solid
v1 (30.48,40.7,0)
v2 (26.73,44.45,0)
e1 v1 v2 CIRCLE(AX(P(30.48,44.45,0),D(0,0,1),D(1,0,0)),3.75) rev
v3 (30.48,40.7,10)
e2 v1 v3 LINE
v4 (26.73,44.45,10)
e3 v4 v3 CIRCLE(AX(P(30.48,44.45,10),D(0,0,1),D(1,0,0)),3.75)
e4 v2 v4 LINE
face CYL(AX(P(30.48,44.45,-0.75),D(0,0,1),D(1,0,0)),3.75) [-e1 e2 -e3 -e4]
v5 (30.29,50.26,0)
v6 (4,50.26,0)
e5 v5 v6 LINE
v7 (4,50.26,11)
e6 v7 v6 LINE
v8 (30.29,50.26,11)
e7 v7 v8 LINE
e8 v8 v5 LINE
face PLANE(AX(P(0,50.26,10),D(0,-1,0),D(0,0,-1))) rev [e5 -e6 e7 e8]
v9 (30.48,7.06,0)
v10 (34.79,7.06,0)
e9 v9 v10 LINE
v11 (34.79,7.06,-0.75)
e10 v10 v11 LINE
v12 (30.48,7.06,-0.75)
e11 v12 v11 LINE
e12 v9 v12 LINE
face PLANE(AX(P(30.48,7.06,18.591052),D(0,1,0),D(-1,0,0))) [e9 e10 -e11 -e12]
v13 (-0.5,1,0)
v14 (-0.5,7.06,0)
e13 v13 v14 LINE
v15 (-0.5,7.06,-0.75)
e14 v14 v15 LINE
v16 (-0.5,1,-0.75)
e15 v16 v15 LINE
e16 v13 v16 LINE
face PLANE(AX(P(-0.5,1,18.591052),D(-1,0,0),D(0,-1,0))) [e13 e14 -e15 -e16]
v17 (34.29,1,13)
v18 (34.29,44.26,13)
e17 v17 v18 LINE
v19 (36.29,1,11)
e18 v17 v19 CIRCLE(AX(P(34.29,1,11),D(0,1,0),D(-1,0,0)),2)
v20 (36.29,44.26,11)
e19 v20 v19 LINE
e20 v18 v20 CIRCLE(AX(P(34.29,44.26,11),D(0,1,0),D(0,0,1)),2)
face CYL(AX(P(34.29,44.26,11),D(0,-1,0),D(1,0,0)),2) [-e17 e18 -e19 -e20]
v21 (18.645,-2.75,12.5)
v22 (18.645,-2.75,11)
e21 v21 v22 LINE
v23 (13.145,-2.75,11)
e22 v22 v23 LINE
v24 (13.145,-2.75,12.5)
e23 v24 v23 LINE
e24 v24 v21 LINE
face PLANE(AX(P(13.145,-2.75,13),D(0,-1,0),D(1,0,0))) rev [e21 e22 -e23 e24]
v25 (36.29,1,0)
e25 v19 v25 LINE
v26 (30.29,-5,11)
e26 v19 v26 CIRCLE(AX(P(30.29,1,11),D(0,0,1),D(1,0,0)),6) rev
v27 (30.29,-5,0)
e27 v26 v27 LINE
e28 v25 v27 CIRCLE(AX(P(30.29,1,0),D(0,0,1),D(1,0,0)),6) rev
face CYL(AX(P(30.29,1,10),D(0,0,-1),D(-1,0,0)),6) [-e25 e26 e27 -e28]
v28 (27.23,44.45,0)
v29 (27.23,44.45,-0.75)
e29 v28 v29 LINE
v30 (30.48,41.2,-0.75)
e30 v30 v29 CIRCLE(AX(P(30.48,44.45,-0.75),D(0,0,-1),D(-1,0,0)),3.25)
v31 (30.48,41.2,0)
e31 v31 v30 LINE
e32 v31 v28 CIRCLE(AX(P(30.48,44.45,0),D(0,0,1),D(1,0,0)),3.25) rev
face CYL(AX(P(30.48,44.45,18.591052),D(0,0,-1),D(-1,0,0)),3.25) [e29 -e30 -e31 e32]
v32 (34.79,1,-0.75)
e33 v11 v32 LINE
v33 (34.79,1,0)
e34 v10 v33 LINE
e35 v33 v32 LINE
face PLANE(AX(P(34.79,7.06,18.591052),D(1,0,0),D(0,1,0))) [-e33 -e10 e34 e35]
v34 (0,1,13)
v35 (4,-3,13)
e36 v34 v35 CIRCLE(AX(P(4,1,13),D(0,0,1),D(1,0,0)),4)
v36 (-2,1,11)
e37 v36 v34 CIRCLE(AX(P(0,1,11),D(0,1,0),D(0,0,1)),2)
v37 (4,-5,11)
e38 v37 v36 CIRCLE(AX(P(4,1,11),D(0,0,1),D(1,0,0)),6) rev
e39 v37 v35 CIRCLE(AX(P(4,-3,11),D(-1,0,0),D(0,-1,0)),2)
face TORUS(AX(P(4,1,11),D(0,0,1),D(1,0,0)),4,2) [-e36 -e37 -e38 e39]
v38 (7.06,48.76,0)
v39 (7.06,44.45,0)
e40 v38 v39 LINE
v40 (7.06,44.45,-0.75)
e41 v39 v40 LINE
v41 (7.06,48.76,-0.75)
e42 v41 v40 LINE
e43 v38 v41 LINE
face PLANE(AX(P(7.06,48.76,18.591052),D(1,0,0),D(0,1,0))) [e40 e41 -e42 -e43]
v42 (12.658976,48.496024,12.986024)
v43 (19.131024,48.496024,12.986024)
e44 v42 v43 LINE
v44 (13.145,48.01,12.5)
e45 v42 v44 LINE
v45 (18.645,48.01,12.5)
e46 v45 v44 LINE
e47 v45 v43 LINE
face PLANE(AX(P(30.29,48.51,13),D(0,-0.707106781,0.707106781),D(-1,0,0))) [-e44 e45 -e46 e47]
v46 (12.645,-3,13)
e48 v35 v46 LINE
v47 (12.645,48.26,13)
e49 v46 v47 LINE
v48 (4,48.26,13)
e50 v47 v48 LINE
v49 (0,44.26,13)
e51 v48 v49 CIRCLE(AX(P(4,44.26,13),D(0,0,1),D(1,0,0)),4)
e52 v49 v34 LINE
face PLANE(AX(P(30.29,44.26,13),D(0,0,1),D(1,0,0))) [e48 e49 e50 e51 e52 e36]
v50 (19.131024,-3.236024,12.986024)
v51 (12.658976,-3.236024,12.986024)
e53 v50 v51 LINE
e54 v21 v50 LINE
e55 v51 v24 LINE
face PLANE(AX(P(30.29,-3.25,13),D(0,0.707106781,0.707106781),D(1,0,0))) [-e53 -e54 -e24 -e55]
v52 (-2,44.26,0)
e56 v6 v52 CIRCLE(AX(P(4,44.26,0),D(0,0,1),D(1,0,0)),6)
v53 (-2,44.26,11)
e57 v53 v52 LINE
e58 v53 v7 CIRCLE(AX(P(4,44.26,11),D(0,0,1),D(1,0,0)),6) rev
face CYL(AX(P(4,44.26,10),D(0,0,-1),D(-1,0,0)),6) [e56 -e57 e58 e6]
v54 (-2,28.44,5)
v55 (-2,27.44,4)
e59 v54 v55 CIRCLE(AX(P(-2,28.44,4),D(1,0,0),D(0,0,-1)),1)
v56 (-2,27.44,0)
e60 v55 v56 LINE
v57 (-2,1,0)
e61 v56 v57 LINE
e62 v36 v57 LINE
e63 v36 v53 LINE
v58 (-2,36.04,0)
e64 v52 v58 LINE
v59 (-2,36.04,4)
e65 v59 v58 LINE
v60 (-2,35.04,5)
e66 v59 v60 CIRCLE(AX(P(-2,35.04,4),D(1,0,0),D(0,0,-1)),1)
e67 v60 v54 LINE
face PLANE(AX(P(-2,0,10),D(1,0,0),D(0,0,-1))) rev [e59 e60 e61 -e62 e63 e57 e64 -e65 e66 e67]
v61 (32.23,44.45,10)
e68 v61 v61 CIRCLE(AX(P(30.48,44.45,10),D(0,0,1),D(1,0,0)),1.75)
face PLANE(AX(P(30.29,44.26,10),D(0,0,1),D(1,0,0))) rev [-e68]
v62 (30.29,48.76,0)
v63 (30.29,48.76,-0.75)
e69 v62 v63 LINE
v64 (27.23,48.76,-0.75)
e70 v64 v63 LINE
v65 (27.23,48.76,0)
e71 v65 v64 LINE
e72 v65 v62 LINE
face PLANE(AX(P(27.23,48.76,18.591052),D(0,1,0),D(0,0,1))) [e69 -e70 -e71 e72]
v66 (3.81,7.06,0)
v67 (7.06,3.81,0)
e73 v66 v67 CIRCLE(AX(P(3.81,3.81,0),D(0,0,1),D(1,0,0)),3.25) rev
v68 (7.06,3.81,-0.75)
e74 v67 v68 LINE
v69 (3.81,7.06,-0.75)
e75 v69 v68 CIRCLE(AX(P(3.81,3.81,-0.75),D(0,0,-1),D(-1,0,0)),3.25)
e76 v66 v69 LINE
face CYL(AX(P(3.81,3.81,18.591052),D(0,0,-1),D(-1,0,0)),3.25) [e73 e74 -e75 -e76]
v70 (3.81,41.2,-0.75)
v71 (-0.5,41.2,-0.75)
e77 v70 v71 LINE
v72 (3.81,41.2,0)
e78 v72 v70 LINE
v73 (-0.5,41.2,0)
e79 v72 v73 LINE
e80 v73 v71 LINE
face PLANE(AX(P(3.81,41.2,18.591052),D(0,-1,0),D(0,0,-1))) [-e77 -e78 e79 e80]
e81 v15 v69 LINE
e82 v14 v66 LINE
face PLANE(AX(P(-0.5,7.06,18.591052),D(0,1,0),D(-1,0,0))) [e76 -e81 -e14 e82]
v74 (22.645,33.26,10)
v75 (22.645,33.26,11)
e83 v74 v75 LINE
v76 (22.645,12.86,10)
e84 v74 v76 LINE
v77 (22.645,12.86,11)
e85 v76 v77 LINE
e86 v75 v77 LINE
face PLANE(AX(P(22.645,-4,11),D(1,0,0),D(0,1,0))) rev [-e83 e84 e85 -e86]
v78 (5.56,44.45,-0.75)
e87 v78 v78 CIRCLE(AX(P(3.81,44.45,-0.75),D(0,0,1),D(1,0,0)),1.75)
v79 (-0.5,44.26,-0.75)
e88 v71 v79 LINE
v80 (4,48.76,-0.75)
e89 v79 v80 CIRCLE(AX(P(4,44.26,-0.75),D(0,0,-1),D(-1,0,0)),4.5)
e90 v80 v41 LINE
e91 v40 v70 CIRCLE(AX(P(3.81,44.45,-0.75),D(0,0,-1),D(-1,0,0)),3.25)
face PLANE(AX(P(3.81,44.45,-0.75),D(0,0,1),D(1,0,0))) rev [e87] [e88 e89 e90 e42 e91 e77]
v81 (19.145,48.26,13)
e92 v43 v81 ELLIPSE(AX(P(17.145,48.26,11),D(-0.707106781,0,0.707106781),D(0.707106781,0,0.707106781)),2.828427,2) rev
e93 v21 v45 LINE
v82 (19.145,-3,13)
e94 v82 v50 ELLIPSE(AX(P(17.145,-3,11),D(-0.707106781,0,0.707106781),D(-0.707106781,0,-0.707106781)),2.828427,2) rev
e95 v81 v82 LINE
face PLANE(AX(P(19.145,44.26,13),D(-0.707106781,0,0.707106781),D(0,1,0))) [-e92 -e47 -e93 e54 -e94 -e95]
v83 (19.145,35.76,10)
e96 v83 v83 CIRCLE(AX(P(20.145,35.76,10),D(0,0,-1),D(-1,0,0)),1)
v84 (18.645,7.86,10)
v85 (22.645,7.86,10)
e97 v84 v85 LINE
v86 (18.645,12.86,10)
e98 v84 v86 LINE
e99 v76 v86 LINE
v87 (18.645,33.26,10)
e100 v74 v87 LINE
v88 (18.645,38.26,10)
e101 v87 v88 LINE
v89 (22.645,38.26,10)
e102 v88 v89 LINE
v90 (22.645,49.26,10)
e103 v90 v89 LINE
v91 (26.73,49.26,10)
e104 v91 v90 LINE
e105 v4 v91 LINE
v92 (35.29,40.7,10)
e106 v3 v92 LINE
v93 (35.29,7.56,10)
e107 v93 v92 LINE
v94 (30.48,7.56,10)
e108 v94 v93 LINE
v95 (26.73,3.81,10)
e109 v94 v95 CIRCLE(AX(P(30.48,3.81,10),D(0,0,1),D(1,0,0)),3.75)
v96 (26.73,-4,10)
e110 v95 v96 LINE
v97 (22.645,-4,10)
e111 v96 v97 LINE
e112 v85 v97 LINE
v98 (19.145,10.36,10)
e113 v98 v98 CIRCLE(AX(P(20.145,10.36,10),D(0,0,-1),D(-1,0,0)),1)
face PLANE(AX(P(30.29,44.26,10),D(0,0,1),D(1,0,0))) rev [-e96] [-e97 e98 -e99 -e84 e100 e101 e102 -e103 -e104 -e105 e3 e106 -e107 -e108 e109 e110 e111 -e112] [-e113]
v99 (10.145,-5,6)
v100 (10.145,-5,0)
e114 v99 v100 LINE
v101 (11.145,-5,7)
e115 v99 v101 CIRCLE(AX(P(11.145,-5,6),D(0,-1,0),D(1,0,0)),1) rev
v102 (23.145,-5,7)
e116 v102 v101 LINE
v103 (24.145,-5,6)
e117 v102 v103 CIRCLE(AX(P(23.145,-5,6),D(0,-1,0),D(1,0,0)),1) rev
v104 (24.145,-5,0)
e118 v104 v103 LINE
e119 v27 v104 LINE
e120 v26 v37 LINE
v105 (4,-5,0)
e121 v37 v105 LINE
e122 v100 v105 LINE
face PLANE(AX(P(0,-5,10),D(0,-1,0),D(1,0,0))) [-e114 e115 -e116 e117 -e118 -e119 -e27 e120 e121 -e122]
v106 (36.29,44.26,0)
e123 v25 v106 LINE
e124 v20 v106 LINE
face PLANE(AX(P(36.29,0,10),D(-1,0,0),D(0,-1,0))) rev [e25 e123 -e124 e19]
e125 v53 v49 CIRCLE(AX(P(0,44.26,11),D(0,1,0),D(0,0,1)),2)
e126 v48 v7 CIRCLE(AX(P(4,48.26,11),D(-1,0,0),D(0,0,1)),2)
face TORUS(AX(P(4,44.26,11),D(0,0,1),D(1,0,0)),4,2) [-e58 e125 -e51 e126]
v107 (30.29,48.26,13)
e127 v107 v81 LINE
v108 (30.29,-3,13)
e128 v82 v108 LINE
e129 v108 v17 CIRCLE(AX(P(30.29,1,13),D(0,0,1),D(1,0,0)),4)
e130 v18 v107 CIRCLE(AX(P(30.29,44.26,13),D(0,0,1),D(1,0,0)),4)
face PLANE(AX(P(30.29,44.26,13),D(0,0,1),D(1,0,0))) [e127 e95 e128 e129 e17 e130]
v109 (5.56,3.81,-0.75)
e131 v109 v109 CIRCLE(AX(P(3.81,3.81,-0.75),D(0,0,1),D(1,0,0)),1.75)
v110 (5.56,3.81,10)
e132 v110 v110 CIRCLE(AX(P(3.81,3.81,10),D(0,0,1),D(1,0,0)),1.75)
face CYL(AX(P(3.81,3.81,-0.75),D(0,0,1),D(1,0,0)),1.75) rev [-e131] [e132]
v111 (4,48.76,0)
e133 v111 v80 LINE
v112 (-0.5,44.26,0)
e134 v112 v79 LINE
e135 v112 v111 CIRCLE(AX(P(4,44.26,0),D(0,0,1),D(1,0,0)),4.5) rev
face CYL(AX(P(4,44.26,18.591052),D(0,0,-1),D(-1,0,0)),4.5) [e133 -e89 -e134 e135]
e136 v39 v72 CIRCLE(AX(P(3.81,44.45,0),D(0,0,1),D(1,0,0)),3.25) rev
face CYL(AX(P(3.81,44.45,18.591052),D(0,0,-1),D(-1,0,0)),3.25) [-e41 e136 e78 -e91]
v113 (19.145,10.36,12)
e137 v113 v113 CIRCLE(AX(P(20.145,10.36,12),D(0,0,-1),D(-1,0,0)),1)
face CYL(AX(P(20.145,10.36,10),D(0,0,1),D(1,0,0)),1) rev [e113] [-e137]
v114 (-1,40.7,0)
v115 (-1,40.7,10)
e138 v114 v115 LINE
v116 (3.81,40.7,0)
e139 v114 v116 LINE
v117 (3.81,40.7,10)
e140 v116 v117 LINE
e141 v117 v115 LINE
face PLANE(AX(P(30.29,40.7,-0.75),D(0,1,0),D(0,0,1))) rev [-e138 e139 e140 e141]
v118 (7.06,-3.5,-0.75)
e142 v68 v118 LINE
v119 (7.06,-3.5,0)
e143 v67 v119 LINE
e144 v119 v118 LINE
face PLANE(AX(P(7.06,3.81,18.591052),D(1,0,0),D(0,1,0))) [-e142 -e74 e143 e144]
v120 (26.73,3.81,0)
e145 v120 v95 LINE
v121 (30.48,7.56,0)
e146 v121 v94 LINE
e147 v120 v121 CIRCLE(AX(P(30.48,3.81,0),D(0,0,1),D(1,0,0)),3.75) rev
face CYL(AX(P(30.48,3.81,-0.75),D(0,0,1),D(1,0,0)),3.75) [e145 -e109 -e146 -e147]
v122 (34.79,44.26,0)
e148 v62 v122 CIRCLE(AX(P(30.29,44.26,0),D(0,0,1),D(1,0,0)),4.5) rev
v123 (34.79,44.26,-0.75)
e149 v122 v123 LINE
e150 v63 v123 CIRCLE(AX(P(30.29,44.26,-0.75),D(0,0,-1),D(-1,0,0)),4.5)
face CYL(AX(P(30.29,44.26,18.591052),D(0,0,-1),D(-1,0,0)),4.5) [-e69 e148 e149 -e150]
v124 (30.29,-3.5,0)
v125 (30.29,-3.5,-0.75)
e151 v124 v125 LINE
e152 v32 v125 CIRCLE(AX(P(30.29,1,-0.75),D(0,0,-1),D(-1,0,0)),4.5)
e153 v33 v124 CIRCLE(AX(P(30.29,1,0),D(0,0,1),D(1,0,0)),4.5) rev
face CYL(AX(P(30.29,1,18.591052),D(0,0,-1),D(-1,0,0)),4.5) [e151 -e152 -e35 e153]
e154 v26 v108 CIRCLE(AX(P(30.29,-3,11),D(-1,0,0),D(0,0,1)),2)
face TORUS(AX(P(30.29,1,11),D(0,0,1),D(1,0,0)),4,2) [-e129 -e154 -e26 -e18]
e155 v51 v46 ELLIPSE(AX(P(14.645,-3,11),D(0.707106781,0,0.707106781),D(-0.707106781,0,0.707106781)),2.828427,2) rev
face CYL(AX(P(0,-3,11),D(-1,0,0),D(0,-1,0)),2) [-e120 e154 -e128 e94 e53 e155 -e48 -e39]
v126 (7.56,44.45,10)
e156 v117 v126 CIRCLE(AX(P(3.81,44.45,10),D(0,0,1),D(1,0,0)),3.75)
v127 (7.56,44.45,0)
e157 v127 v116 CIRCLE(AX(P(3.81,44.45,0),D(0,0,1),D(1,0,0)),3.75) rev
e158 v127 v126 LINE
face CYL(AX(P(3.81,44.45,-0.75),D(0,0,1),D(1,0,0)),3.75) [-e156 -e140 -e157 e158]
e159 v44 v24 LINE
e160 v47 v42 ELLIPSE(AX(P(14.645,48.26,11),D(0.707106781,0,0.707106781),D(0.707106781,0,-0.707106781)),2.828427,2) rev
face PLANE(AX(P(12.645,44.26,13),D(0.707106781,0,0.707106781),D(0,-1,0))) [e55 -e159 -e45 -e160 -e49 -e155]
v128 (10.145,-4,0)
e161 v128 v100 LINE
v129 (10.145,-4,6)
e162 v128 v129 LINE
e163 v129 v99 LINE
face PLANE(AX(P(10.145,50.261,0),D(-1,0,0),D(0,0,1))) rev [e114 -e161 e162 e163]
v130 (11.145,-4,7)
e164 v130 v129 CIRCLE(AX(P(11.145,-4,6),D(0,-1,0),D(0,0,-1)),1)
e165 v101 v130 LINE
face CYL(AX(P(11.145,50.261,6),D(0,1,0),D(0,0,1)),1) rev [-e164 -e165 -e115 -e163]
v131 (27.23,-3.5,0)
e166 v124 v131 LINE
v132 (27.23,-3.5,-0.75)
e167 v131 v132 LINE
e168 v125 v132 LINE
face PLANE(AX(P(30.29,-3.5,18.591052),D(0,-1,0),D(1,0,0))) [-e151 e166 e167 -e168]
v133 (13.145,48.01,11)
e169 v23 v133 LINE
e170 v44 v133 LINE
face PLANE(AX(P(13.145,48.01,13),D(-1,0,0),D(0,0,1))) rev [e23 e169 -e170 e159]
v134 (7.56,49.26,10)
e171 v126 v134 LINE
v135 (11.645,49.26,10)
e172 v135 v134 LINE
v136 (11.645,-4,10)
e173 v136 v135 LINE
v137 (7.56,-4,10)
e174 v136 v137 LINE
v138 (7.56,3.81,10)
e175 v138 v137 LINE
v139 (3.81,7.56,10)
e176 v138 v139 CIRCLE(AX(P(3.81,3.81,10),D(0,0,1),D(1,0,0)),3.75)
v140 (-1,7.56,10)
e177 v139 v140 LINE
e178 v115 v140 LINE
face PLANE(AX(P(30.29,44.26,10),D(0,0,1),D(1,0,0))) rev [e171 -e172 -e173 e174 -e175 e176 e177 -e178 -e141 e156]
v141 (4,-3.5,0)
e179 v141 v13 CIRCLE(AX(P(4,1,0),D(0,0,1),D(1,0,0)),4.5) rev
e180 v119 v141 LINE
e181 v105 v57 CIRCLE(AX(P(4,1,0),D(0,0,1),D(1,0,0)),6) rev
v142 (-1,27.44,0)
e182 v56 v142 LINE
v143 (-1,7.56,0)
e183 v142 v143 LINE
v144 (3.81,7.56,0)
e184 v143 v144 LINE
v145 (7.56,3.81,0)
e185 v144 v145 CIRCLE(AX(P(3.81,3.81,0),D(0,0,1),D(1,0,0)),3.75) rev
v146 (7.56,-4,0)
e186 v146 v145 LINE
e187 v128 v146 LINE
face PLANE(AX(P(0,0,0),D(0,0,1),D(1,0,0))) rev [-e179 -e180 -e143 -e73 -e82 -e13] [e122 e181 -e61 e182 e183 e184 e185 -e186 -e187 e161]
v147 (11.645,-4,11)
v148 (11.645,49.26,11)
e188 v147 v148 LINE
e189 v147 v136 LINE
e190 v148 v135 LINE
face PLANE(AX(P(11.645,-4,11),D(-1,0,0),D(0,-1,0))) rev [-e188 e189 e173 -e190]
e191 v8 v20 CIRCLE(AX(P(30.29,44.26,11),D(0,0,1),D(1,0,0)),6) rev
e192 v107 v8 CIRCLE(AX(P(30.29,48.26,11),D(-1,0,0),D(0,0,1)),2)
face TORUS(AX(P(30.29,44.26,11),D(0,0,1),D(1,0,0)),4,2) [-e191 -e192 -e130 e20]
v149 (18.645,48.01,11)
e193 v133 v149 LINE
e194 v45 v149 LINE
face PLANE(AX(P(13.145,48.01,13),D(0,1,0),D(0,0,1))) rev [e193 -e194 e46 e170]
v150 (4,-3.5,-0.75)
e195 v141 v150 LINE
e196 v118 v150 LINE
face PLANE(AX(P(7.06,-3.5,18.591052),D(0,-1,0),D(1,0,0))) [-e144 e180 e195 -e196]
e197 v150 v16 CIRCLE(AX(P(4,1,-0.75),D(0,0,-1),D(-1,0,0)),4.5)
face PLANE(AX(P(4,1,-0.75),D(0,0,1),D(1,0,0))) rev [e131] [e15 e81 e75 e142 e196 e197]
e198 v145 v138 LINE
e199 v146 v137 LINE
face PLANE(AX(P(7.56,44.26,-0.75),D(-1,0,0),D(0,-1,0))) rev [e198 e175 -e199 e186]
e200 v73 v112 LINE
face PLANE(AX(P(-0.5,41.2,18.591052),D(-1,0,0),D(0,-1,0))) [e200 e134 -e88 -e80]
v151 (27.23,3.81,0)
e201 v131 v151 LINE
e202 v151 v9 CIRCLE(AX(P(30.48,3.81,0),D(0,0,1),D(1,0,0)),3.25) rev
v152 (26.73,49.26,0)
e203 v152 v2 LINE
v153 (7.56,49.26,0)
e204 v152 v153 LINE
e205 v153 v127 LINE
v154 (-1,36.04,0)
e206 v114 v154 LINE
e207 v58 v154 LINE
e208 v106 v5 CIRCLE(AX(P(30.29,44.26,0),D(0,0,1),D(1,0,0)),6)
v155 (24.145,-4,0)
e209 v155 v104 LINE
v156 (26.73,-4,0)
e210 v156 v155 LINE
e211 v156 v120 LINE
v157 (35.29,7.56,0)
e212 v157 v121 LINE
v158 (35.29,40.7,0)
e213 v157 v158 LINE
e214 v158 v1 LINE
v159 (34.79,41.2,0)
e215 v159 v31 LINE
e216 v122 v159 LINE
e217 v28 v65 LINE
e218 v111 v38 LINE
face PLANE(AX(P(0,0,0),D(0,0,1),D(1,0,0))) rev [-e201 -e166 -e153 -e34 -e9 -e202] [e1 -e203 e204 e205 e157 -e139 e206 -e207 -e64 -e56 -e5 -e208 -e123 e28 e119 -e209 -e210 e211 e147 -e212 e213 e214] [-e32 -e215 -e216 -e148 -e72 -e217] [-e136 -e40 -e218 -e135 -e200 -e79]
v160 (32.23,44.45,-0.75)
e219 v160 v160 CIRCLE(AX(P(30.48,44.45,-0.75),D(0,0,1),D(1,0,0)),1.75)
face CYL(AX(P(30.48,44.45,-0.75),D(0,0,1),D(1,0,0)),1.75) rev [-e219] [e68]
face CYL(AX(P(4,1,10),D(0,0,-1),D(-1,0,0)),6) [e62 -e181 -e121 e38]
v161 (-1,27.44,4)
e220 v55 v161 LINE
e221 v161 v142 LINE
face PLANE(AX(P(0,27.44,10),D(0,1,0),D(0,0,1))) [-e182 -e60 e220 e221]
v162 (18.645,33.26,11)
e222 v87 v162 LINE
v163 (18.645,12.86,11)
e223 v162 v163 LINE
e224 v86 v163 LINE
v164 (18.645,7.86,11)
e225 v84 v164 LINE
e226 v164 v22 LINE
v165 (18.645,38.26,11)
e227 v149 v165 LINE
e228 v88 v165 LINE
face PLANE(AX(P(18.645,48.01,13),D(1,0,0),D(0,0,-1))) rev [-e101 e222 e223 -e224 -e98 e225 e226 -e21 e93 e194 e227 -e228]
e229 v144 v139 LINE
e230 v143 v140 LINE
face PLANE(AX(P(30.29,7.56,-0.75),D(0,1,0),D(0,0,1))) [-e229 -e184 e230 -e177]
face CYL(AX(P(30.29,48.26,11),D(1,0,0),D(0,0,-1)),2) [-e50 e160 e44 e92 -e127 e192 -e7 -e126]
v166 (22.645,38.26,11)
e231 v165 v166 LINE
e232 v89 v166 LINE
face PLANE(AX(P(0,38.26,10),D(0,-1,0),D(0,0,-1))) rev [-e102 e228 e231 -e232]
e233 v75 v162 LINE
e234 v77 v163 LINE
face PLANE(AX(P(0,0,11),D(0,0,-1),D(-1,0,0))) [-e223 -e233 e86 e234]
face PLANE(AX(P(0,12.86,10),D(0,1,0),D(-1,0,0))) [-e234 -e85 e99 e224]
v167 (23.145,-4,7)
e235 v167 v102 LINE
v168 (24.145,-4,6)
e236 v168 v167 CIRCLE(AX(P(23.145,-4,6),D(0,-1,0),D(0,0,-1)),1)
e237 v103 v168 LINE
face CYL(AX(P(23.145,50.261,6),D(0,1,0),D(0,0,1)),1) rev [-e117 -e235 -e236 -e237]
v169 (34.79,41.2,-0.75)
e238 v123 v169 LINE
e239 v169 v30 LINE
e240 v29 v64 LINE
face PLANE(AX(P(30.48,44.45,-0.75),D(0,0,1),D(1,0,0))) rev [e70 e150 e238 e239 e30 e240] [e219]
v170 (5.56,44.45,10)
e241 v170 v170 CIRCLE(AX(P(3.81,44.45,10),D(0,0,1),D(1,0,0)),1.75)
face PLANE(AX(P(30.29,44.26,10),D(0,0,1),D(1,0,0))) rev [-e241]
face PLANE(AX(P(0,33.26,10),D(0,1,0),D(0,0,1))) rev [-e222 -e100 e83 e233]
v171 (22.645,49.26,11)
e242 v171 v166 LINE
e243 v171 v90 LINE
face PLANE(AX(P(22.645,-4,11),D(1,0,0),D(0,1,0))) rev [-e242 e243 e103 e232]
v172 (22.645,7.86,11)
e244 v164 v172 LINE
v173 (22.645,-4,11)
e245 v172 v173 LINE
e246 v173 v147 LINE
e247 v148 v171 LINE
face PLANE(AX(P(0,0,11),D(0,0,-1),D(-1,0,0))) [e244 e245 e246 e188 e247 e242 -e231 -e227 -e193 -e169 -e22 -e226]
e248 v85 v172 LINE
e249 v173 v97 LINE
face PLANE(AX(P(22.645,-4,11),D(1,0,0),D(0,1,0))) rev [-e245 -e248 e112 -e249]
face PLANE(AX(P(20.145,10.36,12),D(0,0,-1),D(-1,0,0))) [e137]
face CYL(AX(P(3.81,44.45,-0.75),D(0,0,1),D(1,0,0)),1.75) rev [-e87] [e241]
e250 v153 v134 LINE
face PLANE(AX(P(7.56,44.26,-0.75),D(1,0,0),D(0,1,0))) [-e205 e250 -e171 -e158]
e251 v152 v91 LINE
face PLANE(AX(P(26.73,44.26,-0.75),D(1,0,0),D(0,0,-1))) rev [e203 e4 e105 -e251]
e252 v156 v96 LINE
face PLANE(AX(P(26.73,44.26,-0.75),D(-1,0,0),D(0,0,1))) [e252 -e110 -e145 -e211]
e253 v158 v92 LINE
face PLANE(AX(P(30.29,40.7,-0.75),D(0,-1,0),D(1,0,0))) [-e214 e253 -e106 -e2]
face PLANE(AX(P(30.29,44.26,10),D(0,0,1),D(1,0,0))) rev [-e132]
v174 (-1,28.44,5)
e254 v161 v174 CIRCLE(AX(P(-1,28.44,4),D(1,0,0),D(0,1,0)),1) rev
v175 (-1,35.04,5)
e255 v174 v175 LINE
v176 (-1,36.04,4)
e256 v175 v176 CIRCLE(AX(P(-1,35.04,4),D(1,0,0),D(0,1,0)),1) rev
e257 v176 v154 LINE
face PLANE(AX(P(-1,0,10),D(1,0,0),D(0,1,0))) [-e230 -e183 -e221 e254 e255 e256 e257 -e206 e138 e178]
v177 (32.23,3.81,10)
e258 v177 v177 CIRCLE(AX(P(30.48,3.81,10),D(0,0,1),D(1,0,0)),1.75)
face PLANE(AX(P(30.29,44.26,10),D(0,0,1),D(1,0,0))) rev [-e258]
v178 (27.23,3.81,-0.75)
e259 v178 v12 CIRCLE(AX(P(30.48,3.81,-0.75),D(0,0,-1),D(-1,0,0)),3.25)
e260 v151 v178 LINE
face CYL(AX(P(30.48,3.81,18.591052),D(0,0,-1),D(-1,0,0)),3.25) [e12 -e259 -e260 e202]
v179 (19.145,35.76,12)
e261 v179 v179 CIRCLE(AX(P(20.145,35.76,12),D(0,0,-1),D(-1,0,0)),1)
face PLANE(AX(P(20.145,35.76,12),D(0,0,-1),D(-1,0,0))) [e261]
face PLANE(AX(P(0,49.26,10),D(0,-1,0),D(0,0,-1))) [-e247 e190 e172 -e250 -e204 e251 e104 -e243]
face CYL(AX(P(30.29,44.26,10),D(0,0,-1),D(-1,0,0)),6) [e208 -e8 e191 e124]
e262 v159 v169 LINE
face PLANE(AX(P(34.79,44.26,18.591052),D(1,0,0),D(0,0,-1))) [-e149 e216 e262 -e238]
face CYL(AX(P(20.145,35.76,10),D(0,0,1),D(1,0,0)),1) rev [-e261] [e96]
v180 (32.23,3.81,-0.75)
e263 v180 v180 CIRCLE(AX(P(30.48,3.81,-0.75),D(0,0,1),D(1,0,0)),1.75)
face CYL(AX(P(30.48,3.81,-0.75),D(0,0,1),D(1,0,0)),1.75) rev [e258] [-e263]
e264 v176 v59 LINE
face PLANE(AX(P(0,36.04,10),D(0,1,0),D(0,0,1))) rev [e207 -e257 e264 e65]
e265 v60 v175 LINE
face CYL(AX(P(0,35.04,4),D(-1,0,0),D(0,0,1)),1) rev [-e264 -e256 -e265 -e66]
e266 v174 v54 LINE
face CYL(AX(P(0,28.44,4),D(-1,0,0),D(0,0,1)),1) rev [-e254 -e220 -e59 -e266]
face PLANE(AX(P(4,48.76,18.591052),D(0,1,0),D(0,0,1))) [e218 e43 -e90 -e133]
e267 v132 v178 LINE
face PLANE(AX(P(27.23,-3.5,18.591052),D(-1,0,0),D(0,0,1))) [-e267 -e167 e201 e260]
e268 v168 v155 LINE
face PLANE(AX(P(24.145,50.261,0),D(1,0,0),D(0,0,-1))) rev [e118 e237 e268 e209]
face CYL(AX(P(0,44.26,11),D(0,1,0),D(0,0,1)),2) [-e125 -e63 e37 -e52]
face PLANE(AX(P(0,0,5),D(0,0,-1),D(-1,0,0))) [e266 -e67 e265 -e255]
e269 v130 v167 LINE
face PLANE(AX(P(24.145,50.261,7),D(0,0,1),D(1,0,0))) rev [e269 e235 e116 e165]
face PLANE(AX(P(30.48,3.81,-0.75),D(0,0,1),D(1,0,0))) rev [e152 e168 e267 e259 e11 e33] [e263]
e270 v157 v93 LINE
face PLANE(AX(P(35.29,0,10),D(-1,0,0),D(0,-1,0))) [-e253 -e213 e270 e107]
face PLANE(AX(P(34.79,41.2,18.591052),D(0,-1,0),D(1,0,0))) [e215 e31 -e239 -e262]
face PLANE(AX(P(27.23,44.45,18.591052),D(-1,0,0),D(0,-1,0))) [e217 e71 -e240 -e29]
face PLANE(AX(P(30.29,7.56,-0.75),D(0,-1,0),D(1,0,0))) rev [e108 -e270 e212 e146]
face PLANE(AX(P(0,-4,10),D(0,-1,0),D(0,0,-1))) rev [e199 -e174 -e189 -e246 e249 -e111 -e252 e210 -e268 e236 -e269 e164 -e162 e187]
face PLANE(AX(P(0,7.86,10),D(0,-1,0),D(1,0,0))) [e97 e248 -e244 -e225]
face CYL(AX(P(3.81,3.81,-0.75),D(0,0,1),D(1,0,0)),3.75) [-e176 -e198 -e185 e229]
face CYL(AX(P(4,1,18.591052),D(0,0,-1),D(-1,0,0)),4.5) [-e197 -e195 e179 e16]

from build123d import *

# Parameters (mm, degrees)
BOSS_EXTRUDE1_DEPTH = 10
SKETCH12_W          = 1
SKETCH12_H          = 8.6
BOSS_EXTRUDE8_DEPTH = 5
BOSS_EXTRUDE5_DEPTH = 3
BOSS_EXTRUDE6_START = 10.75
SKETCH10_R          = 1.75
BOSS_EXTRUDE6_DEPTH = 10.75
SKETCH11_W          = 14.1
SKETCH11_H          = 1
BOSS_EXTRUDE7_DEPTH = 1.5
FILLET1_R           = 2
CUT_EXTRUDE2_REACH  = 69.377
SKETCH13_W          = 14
SKETCH13_H          = 7
FILLET2_R           = 1
SKETCH14_W          = 11
SKETCH14_H          = 53.26
CUT_EXTRUDE3_DEPTH  = 1
SKETCH15_W          = 5.5
SKETCH15_H          = 50.76
CUT_EXTRUDE4_DEPTH  = 64.095912704
SKETCH17_W          = 4
SKETCH17_H          = 5
SKETCH17_R          = 1
BOSS_EXTRUDE9_DEPTH = 1
CHAMFER1_SIZE       = 0.5
CUT_EXTRUDE5_START  = -1
SKETCH18_R          = 1
CUT_EXTRUDE5_DEPTH  = 1
CUT_EXTRUDE7_DEPTH  = 0.75


with BuildPart() as part:
    # Sketch1 → Boss-Extrude1 (new body)
    with BuildSketch(Plane.XY):
        with BuildLine():
            Line((-1, 27.44), (-1, 1))
            ThreePointArc((-1, 1), (0.464466094, -2.535533906), (4, -4))
            Line((4, -4), (30.29, -4))
            ThreePointArc((30.29, -4), (33.825533906, -2.535533906), (35.29, 1))
            Line((35.29, 1), (35.29, 44.26))
            ThreePointArc((35.29, 44.26), (33.825533906, 47.795533906), (30.29, 49.26))
            Line((30.29, 49.26), (4, 49.26))
            ThreePointArc((4, 49.26), (0.464466094, 47.795533906), (-1, 44.26))
            Line((-1, 44.26), (-1, 36.04))
            Line((-1, 36.04), (-2, 36.04))
            Line((-2, 36.04), (-2, 44.26))
            ThreePointArc((-2, 44.26), (-0.242640687, 48.502640687), (4, 50.26))
            Line((4, 50.26), (30.29, 50.26))
            ThreePointArc((30.29, 50.26), (34.532640687, 48.502640687), (36.29, 44.26))
            Line((36.29, 44.26), (36.29, 1))
            ThreePointArc((36.29, 1), (34.532640687, -3.242640687), (30.29, -5))
            Line((30.29, -5), (4, -5))
            ThreePointArc((4, -5), (-0.242640687, -3.242640687), (-2, 1))
            Line((-2, 1), (-2, 27.44))
            Line((-2, 27.44), (-1, 27.44))
        make_face()
    extrude(amount=BOSS_EXTRUDE1_DEPTH)

    # Sketch12 → Boss-Extrude8 (add)
    with BuildSketch(Plane.XY.offset(10)):
        with Locations((-1.5, 31.74)):
            Rectangle(SKETCH12_W, SKETCH12_H)
    extrude(amount=-BOSS_EXTRUDE8_DEPTH)

    # Sketch8 → Boss-Extrude5 (add)
    with BuildSketch(Plane.XY.offset(10)):
        with BuildLine():
            Line((-2, 44.26), (-2, 1))
            ThreePointArc((-2, 1), (-0.242640687, -3.242640687), (4, -5))
            Line((4, -5), (30.29, -5))
            ThreePointArc((30.29, -5), (34.532640687, -3.242640687), (36.29, 1))
            Line((36.29, 1), (36.29, 44.26))
            ThreePointArc((36.29, 44.26), (34.532640687, 48.502640687), (30.29, 50.26))
            Line((30.29, 50.26), (4, 50.26))
            ThreePointArc((4, 50.26), (-0.242640687, 48.502640687), (-2, 44.26))
        make_face()
    extrude(amount=BOSS_EXTRUDE5_DEPTH)

    # Sketch10 → Boss-Extrude6 (add)
    # profile 1 of 4: a face of its own
    with BuildSketch(Plane(origin=(0, 0, 10), x_dir=(-1, 0, 0), z_dir=(0, 0, -1)).offset(BOSS_EXTRUDE6_START)):
        with BuildLine():
            Line((-30.29, 49.26), (-26.73, 49.26))
            Line((-26.73, 49.26), (-26.73, 44.45))
            ThreePointArc((-26.73, 44.45), (-27.828349571, 41.798349571), (-30.48, 40.7))
            Line((-30.48, 40.7), (-35.29, 40.7))
            Line((-35.29, 40.7), (-35.29, 44.26))
            ThreePointArc((-35.29, 44.26), (-33.825533906, 47.795533906), (-30.29, 49.26))
        make_face()
        with Locations(Location((-30.48, 44.45, 0), (0, 0, 180))):
            Circle(SKETCH10_R, mode=Mode.SUBTRACT)
    # profile 2 of 4: a face of its own
    with BuildSketch(Plane(origin=(0, 0, 10), x_dir=(-1, 0, 0), z_dir=(0, 0, -1)).offset(BOSS_EXTRUDE6_START)):
        with BuildLine():
            Line((-3.81, 40.7), (1, 40.7))
            Line((1, 40.7), (1, 44.26))
            ThreePointArc((1, 44.26), (-0.464466094, 47.795533906), (-4, 49.26))
            Line((-4, 49.26), (-7.56, 49.26))
            Line((-7.56, 49.26), (-7.56, 44.45))
            ThreePointArc((-7.56, 44.45), (-6.461650429, 41.798349571), (-3.81, 40.7))
        make_face()
        with Locations(Location((-3.81, 44.45, 0), (0, 0, 180))):
            Circle(SKETCH10_R, mode=Mode.SUBTRACT)
    # profile 3 of 4: a face of its own
    with BuildSketch(Plane(origin=(0, 0, 10), x_dir=(-1, 0, 0), z_dir=(0, 0, -1)).offset(BOSS_EXTRUDE6_START)):
        with BuildLine():
            Line((1, 7.56), (1, 1))
            ThreePointArc((1, 1), (-0.464466094, -2.535533906), (-4, -4))
            Line((-4, -4), (-7.56, -4))
            Line((-7.56, -4), (-7.56, 3.81))
            ThreePointArc((-7.56, 3.81), (-6.461650429, 6.461650429), (-3.81, 7.56))
            Line((-3.81, 7.56), (1, 7.56))
        make_face()
        with Locations(Location((-3.81, 3.81, 0), (0, 0, 180))):
            Circle(SKETCH10_R, mode=Mode.SUBTRACT)
    # profile 4 of 4: a face of its own
    with BuildSketch(Plane(origin=(0, 0, 10), x_dir=(-1, 0, 0), z_dir=(0, 0, -1)).offset(BOSS_EXTRUDE6_START)):
        with BuildLine():
            Line((-26.73, -4), (-30.29, -4))
            ThreePointArc((-30.29, -4), (-33.825533906, -2.535533906), (-35.29, 1))
            Line((-35.29, 1), (-35.29, 7.56))
            Line((-35.29, 7.56), (-30.48, 7.56))
            ThreePointArc((-30.48, 7.56), (-27.828349571, 6.461650429), (-26.73, 3.81))
            Line((-26.73, 3.81), (-26.73, -4))
        make_face()
        with Locations(Location((-30.48, 3.81, 0), (0, 0, 180))):
            Circle(SKETCH10_R, mode=Mode.SUBTRACT)
    extrude(amount=-BOSS_EXTRUDE6_DEPTH)

    # Sketch11 → Boss-Extrude7 (add)
    with BuildSketch(Plane(origin=(0, 0, 10), x_dir=(-1, 0, 0), z_dir=(0, 0, -1))):
        with Locations((-17.145, -4.5)):
            Rectangle(SKETCH11_W, SKETCH11_H)
    extrude(amount=BOSS_EXTRUDE7_DEPTH)

    # Fillet1
    fillet1_edges = [part.edges().sort_by_distance(p)[0] for p in [
        (17.145, -5, 13),
        (36.29, 22.63, 13),
        (34.532640687, 48.502640687, 13),
        (17.145, 50.26, 13),
        (-0.242640687, 48.502640687, 13),
        (-2, 22.63, 13),
        (-0.242640687, -3.242640687, 13),
        (34.532640687, -3.242640687, 13),
    ]]
    fillet(fillet1_edges, radius=FILLET1_R)

    # Sketch13 → Cut-Extrude2 (cut, up to next)
    with BuildSketch(Plane.XZ.offset(5), mode=Mode.PRIVATE) as cut_extrude2_sk1:
        with Locations((17.145, 3.5)):
            Rectangle(SKETCH13_W, SKETCH13_H)
    cut_extrude2_tool1 = extrude(cut_extrude2_sk1.sketch, amount=-CUT_EXTRUDE2_REACH, mode=Mode.PRIVATE) & part.part
    add(cut_extrude2_tool1.solids().sort_by_distance((17.145, -5, 3.5))[0], mode=Mode.SUBTRACT)

    # Fillet2
    fillet2_edges = [part.edges().sort_by_distance(p)[0] for p in [
        (-1.5, 36.04, 5),
        (-1.5, 27.44, 5),
        (10.145, -4.5, 7),
        (24.145, -4.5, 7),
    ]]
    fillet(fillet2_edges, radius=FILLET2_R)

    # Sketch14 → Cut-Extrude3 (cut)
    with BuildSketch(Plane(origin=(0, 0, 10), x_dir=(-1, 0, 0), z_dir=(0, 0, -1))):
        with Locations((-17.145, 22.63)):
            Rectangle(SKETCH14_W, SKETCH14_H)
    extrude(amount=-CUT_EXTRUDE3_DEPTH, mode=Mode.SUBTRACT)

    # Sketch15 → Cut-Extrude4 (cut, through all)
    with BuildSketch(Plane(origin=(0, 0, 11), x_dir=(-1, 0, 0), z_dir=(0, 0, -1))):
        with Locations((-15.895, 22.63)):
            Rectangle(SKETCH15_W, SKETCH15_H)
    extrude(amount=-CUT_EXTRUDE4_DEPTH, mode=Mode.SUBTRACT)

    # Sketch17 → Boss-Extrude9 (add)
    # profile 1 of 2: a face of its own
    with BuildSketch(Plane(origin=(0, 0, 11), x_dir=(-1, 0, 0), z_dir=(0, 0, -1))):
        with Locations((-20.645, 10.36)):
            Rectangle(SKETCH17_W, SKETCH17_H)
        with Locations((-20.145, 10.36)):
            Circle(SKETCH17_R, mode=Mode.SUBTRACT)
    # profile 2 of 2: a face of its own
    with BuildSketch(Plane(origin=(0, 0, 11), x_dir=(-1, 0, 0), z_dir=(0, 0, -1))):
        with Locations((-20.645, 35.76)):
            Rectangle(SKETCH17_W, SKETCH17_H)
        with Locations((-20.145, 35.76)):
            Circle(SKETCH17_R, mode=Mode.SUBTRACT)
    extrude(amount=BOSS_EXTRUDE9_DEPTH)

    # Chamfer1
    # the kernel refuses this chamfer: 0.5 mm, written as the material it takes off along each edge
    with BuildSketch(Plane(origin=(13.145, 48.01, 13), x_dir=(-0.9996219169112968, 0, 0.027495876610585647), z_dir=(0, -1, 0)), Plane(origin=(18.645, -2.75, 13), x_dir=(0.9996219169112968, 0, 0.02749587661058555), z_dir=(0, 1, 0))) as chamfer1_piece_1:
        Polygon((CHAMFER1_SIZE * 0.999621916911, CHAMFER1_SIZE * 0.0274958766106), (-CHAMFER1_SIZE * 0.0274958766106, CHAMFER1_SIZE * 0.999621916911), (0, 0), align=None)
    extrude(amount=50.76, mode=Mode.SUBTRACT)
    with BuildSketch(Plane(origin=(13.145, -2.75, 13), x_dir=(0, -0.9996219169112968, 0.0274958766105856), z_dir=(1, 0, 0)), Plane(origin=(18.645, 48.01, 13), x_dir=(0, 0.9996219169112968, 0.02749587661058574), z_dir=(-1, 0, 0))) as chamfer1_piece_2:
        Polygon((CHAMFER1_SIZE * 0.999621916911, CHAMFER1_SIZE * 0.0274958766106), (-CHAMFER1_SIZE * 0.0274958766106, CHAMFER1_SIZE * 0.999621916911), (0, 0), align=None)
    extrude(amount=5.5, mode=Mode.SUBTRACT)
    with BuildSketch(Plane(origin=(18.645, 48.01, 13), x_dir=(0, 0.9996219169112968, 0.02749587661058574), z_dir=(-1, 0, 0))) as chamfer1_piece_3a_section:
        Polygon((CHAMFER1_SIZE * 0.999621916911, CHAMFER1_SIZE * 0.0274958766106), (-CHAMFER1_SIZE * 0.0274958766106, CHAMFER1_SIZE * 0.999621916911), (0, 0), align=None)
    chamfer1_piece_3a = extrude(amount=6.785841494, mode=Mode.PRIVATE)
    chamfer1_piece_3a = split(chamfer1_piece_3a, bisect_by=Plane(origin=(13.145, 48.174896813, 12.835103187), z_dir=(-1, 0, 0)), keep=Keep.TOP, mode=Mode.PRIVATE)
    with BuildSketch(Plane(origin=(13.145, 49.295841494, 13), x_dir=(-0.9996219169112968, 0, 0.027495876610585647), z_dir=(0, -1, 0))) as chamfer1_piece_3b_section:
        Polygon((CHAMFER1_SIZE * 0.999621916911, CHAMFER1_SIZE * 0.0274958766106), (-CHAMFER1_SIZE * 0.0274958766106, CHAMFER1_SIZE * 0.999621916911), (0, 0), align=None)
    chamfer1_piece_3b = extrude(amount=52.045841494, mode=Mode.PRIVATE)
    chamfer1_piece_3b = split(chamfer1_piece_3b, bisect_by=Plane(origin=(12.980103187, 48.01, 12.835103187), z_dir=(0, 1, 0)), keep=Keep.TOP, mode=Mode.PRIVATE)
    chamfer1_piece_3 = chamfer1_piece_3a & chamfer1_piece_3b
    add(chamfer1_piece_3, mode=Mode.SUBTRACT)
    with BuildSketch(Plane(origin=(13.145, 48.01, 13), x_dir=(-0.9996219169112968, 0, 0.027495876610585647), z_dir=(0, -1, 0))) as chamfer1_piece_4a_section:
        Polygon((CHAMFER1_SIZE * 0.999621916911, CHAMFER1_SIZE * 0.0274958766106), (-CHAMFER1_SIZE * 0.0274958766106, CHAMFER1_SIZE * 0.999621916911), (0, 0), align=None)
    chamfer1_piece_4a = extrude(amount=52.045841494, mode=Mode.PRIVATE)
    chamfer1_piece_4a = split(chamfer1_piece_4a, bisect_by=Plane(origin=(12.980103187, -2.75, 12.835103187), z_dir=(0, -1, 0)), keep=Keep.TOP, mode=Mode.PRIVATE)
    with BuildSketch(Plane(origin=(11.859158506, -2.75, 13), x_dir=(0, -0.9996219169112968, 0.027495876610585623), z_dir=(1, 0, 0))) as chamfer1_piece_4b_section:
        Polygon((CHAMFER1_SIZE * 0.999621916911, CHAMFER1_SIZE * 0.0274958766106), (-CHAMFER1_SIZE * 0.0274958766106, CHAMFER1_SIZE * 0.999621916911), (0, 0), align=None)
    chamfer1_piece_4b = extrude(amount=6.785841494, mode=Mode.PRIVATE)
    chamfer1_piece_4b = split(chamfer1_piece_4b, bisect_by=Plane(origin=(13.145, -2.914896813, 12.835103187), z_dir=(-1, 0, 0)), keep=Keep.TOP, mode=Mode.PRIVATE)
    chamfer1_piece_4 = chamfer1_piece_4a & chamfer1_piece_4b
    add(chamfer1_piece_4, mode=Mode.SUBTRACT)
    with BuildSketch(Plane(origin=(13.145, -2.75, 13), x_dir=(0, -0.9996219169112968, 0.0274958766105856), z_dir=(1, 0, 0))) as chamfer1_piece_5a_section:
        Polygon((CHAMFER1_SIZE * 0.999621916911, CHAMFER1_SIZE * 0.0274958766106), (-CHAMFER1_SIZE * 0.0274958766106, CHAMFER1_SIZE * 0.999621916911), (0, 0), align=None)
    chamfer1_piece_5a = extrude(amount=6.785841494, mode=Mode.PRIVATE)
    chamfer1_piece_5a = split(chamfer1_piece_5a, bisect_by=Plane(origin=(18.645, -2.914896813, 12.835103187), z_dir=(1, 0, 0)), keep=Keep.TOP, mode=Mode.PRIVATE)
    with BuildSketch(Plane(origin=(18.645, -4.035841494, 13), x_dir=(0.9996219169112968, 0, 0.02749587661058555), z_dir=(0, 1, 0))) as chamfer1_piece_5b_section:
        Polygon((CHAMFER1_SIZE * 0.999621916911, CHAMFER1_SIZE * 0.0274958766106), (-CHAMFER1_SIZE * 0.0274958766106, CHAMFER1_SIZE * 0.999621916911), (0, 0), align=None)
    chamfer1_piece_5b = extrude(amount=52.045841494, mode=Mode.PRIVATE)
    chamfer1_piece_5b = split(chamfer1_piece_5b, bisect_by=Plane(origin=(18.809896813, -2.75, 12.835103187), z_dir=(0, -1, 0)), keep=Keep.TOP, mode=Mode.PRIVATE)
    chamfer1_piece_5 = chamfer1_piece_5a & chamfer1_piece_5b
    add(chamfer1_piece_5, mode=Mode.SUBTRACT)
    with BuildSketch(Plane(origin=(19.930841494, 48.01, 13), x_dir=(0, 0.9996219169112968, 0.02749587661058574), z_dir=(-1, 0, 0))) as chamfer1_piece_6a_section:
        Polygon((CHAMFER1_SIZE * 0.999621916911, CHAMFER1_SIZE * 0.0274958766106), (-CHAMFER1_SIZE * 0.0274958766106, CHAMFER1_SIZE * 0.999621916911), (0, 0), align=None)
    chamfer1_piece_6a = extrude(amount=6.785841494, mode=Mode.PRIVATE)
    chamfer1_piece_6a = split(chamfer1_piece_6a, bisect_by=Plane(origin=(18.645, 48.174896813, 12.835103187), z_dir=(1, 0, 0)), keep=Keep.TOP, mode=Mode.PRIVATE)
    with BuildSketch(Plane(origin=(18.645, -2.75, 13), x_dir=(0.9996219169112968, 0, 0.02749587661058555), z_dir=(0, 1, 0))) as chamfer1_piece_6b_section:
        Polygon((CHAMFER1_SIZE * 0.999621916911, CHAMFER1_SIZE * 0.0274958766106), (-CHAMFER1_SIZE * 0.0274958766106, CHAMFER1_SIZE * 0.999621916911), (0, 0), align=None)
    chamfer1_piece_6b = extrude(amount=52.045841494, mode=Mode.PRIVATE)
    chamfer1_piece_6b = split(chamfer1_piece_6b, bisect_by=Plane(origin=(18.809896813, 48.01, 12.835103187), z_dir=(0, 1, 0)), keep=Keep.TOP, mode=Mode.PRIVATE)
    chamfer1_piece_6 = chamfer1_piece_6a & chamfer1_piece_6b
    add(chamfer1_piece_6, mode=Mode.SUBTRACT)

    # Sketch18 → Cut-Extrude5 (cut)
    with BuildSketch(Plane(origin=(0, 0, 11), x_dir=(-1, 0, 0), z_dir=(0, 0, -1)).offset(CUT_EXTRUDE5_START)):
        with Locations((-20.145, 10.36)):
            Circle(SKETCH18_R)
        with Locations((-20.145, 35.76)):
            Circle(SKETCH18_R)
    extrude(amount=CUT_EXTRUDE5_DEPTH, mode=Mode.SUBTRACT)

    # Sketch19 → Cut-Extrude7 (cut)
    # profile 1 of 4: a face of its own
    with BuildSketch(Plane(origin=(0, 0, -0.75), x_dir=(-1, 0, 0), z_dir=(0, 0, -1))):
        with BuildLine():
            Line((-25.23, 50.76), (-30.29, 50.76))
            ThreePointArc((-30.29, 50.76), (-34.886194078, 48.856194078), (-36.79, 44.26))
            Line((-36.79, 44.26), (-36.79, 39.2))
            Line((-36.79, 39.2), (-30.48, 39.2))
            ThreePointArc((-30.48, 39.2), (-26.767689399, 40.737689399), (-25.23, 44.45))
            Line((-25.23, 44.45), (-25.23, 50.76))
        make_face()
        with BuildLine():
            Line((-27.23, 48.76), (-30.29, 48.76))
            ThreePointArc((-30.29, 48.76), (-33.471980515, 47.441980515), (-34.79, 44.26))
            Line((-34.79, 44.26), (-34.79, 41.2))
            Line((-34.79, 41.2), (-30.48, 41.2))
            ThreePointArc((-30.48, 41.2), (-28.181902961, 42.151902961), (-27.23, 44.45))
            Line((-27.23, 44.45), (-27.23, 48.76))
        make_face(mode=Mode.SUBTRACT)
    # profile 2 of 4: a face of its own
    with BuildSketch(Plane(origin=(0, 0, -0.75), x_dir=(-1, 0, 0), z_dir=(0, 0, -1))):
        with BuildLine():
            Line((-4, 50.76), (-9.06, 50.76))
            Line((-9.06, 50.76), (-9.06, 44.45))
            ThreePointArc((-9.06, 44.45), (-7.522310601, 40.737689399), (-3.81, 39.2))
            Line((-3.81, 39.2), (2.5, 39.2))
            Line((2.5, 39.2), (2.5, 44.26))
            ThreePointArc((2.5, 44.26), (0.596194078, 48.856194078), (-4, 50.76))
        make_face()
        with BuildLine():
            Line((-4, 48.76), (-7.06, 48.76))
            Line((-7.06, 48.76), (-7.06, 44.45))
            ThreePointArc((-7.06, 44.45), (-6.108097039, 42.151902961), (-3.81, 41.2))
            Line((-3.81, 41.2), (0.5, 41.2))
            Line((0.5, 41.2), (0.5, 44.26))
            ThreePointArc((0.5, 44.26), (-0.818019485, 47.441980515), (-4, 48.76))
        make_face(mode=Mode.SUBTRACT)
    # profile 3 of 4: a face of its own
    with BuildSketch(Plane(origin=(0, 0, -0.75), x_dir=(-1, 0, 0), z_dir=(0, 0, -1))):
        with BuildLine():
            Line((-30.29, -5.5), (-25.23, -5.5))
            Line((-25.23, -5.5), (-25.23, 3.81))
            ThreePointArc((-25.23, 3.81), (-26.767689399, 7.522310601), (-30.48, 9.06))
            Line((-30.48, 9.06), (-36.79, 9.06))
            Line((-36.79, 9.06), (-36.79, 1))
            ThreePointArc((-36.79, 1), (-34.886194078, -3.596194078), (-30.29, -5.5))
        make_face()
        with BuildLine():
            Line((-30.29, -3.5), (-27.23, -3.5))
            Line((-27.23, -3.5), (-27.23, 3.81))
            ThreePointArc((-27.23, 3.81), (-28.181902961, 6.108097039), (-30.48, 7.06))
            Line((-30.48, 7.06), (-34.79, 7.06))
            Line((-34.79, 7.06), (-34.79, 1))
            ThreePointArc((-34.79, 1), (-33.471980515, -2.181980515), (-30.29, -3.5))
        make_face(mode=Mode.SUBTRACT)
    # profile 4 of 4: a face of its own
    with BuildSketch(Plane(origin=(0, 0, -0.75), x_dir=(-1, 0, 0), z_dir=(0, 0, -1))):
        with BuildLine():
            Line((-9.06, -5.5), (-4, -5.5))
            ThreePointArc((-4, -5.5), (0.596194078, -3.596194078), (2.5, 1))
            Line((2.5, 1), (2.5, 9.06))
            Line((2.5, 9.06), (-3.81, 9.06))
            ThreePointArc((-3.81, 9.06), (-7.522310601, 7.522310601), (-9.06, 3.81))
            Line((-9.06, 3.81), (-9.06, -5.5))
        make_face()
        with BuildLine():
            Line((-7.06, -3.5), (-4, -3.5))
            ThreePointArc((-4, -3.5), (-0.818019485, -2.181980515), (0.5, 1))
            Line((0.5, 1), (0.5, 7.06))
            Line((0.5, 7.06), (-3.81, 7.06))
            ThreePointArc((-3.81, 7.06), (-6.108097039, 6.108097039), (-7.06, 3.81))
            Line((-7.06, 3.81), (-7.06, -3.5))
        make_face(mode=Mode.SUBTRACT)
    extrude(amount=-CUT_EXTRUDE7_DEPTH, mode=Mode.SUBTRACT)


solid = part.part
